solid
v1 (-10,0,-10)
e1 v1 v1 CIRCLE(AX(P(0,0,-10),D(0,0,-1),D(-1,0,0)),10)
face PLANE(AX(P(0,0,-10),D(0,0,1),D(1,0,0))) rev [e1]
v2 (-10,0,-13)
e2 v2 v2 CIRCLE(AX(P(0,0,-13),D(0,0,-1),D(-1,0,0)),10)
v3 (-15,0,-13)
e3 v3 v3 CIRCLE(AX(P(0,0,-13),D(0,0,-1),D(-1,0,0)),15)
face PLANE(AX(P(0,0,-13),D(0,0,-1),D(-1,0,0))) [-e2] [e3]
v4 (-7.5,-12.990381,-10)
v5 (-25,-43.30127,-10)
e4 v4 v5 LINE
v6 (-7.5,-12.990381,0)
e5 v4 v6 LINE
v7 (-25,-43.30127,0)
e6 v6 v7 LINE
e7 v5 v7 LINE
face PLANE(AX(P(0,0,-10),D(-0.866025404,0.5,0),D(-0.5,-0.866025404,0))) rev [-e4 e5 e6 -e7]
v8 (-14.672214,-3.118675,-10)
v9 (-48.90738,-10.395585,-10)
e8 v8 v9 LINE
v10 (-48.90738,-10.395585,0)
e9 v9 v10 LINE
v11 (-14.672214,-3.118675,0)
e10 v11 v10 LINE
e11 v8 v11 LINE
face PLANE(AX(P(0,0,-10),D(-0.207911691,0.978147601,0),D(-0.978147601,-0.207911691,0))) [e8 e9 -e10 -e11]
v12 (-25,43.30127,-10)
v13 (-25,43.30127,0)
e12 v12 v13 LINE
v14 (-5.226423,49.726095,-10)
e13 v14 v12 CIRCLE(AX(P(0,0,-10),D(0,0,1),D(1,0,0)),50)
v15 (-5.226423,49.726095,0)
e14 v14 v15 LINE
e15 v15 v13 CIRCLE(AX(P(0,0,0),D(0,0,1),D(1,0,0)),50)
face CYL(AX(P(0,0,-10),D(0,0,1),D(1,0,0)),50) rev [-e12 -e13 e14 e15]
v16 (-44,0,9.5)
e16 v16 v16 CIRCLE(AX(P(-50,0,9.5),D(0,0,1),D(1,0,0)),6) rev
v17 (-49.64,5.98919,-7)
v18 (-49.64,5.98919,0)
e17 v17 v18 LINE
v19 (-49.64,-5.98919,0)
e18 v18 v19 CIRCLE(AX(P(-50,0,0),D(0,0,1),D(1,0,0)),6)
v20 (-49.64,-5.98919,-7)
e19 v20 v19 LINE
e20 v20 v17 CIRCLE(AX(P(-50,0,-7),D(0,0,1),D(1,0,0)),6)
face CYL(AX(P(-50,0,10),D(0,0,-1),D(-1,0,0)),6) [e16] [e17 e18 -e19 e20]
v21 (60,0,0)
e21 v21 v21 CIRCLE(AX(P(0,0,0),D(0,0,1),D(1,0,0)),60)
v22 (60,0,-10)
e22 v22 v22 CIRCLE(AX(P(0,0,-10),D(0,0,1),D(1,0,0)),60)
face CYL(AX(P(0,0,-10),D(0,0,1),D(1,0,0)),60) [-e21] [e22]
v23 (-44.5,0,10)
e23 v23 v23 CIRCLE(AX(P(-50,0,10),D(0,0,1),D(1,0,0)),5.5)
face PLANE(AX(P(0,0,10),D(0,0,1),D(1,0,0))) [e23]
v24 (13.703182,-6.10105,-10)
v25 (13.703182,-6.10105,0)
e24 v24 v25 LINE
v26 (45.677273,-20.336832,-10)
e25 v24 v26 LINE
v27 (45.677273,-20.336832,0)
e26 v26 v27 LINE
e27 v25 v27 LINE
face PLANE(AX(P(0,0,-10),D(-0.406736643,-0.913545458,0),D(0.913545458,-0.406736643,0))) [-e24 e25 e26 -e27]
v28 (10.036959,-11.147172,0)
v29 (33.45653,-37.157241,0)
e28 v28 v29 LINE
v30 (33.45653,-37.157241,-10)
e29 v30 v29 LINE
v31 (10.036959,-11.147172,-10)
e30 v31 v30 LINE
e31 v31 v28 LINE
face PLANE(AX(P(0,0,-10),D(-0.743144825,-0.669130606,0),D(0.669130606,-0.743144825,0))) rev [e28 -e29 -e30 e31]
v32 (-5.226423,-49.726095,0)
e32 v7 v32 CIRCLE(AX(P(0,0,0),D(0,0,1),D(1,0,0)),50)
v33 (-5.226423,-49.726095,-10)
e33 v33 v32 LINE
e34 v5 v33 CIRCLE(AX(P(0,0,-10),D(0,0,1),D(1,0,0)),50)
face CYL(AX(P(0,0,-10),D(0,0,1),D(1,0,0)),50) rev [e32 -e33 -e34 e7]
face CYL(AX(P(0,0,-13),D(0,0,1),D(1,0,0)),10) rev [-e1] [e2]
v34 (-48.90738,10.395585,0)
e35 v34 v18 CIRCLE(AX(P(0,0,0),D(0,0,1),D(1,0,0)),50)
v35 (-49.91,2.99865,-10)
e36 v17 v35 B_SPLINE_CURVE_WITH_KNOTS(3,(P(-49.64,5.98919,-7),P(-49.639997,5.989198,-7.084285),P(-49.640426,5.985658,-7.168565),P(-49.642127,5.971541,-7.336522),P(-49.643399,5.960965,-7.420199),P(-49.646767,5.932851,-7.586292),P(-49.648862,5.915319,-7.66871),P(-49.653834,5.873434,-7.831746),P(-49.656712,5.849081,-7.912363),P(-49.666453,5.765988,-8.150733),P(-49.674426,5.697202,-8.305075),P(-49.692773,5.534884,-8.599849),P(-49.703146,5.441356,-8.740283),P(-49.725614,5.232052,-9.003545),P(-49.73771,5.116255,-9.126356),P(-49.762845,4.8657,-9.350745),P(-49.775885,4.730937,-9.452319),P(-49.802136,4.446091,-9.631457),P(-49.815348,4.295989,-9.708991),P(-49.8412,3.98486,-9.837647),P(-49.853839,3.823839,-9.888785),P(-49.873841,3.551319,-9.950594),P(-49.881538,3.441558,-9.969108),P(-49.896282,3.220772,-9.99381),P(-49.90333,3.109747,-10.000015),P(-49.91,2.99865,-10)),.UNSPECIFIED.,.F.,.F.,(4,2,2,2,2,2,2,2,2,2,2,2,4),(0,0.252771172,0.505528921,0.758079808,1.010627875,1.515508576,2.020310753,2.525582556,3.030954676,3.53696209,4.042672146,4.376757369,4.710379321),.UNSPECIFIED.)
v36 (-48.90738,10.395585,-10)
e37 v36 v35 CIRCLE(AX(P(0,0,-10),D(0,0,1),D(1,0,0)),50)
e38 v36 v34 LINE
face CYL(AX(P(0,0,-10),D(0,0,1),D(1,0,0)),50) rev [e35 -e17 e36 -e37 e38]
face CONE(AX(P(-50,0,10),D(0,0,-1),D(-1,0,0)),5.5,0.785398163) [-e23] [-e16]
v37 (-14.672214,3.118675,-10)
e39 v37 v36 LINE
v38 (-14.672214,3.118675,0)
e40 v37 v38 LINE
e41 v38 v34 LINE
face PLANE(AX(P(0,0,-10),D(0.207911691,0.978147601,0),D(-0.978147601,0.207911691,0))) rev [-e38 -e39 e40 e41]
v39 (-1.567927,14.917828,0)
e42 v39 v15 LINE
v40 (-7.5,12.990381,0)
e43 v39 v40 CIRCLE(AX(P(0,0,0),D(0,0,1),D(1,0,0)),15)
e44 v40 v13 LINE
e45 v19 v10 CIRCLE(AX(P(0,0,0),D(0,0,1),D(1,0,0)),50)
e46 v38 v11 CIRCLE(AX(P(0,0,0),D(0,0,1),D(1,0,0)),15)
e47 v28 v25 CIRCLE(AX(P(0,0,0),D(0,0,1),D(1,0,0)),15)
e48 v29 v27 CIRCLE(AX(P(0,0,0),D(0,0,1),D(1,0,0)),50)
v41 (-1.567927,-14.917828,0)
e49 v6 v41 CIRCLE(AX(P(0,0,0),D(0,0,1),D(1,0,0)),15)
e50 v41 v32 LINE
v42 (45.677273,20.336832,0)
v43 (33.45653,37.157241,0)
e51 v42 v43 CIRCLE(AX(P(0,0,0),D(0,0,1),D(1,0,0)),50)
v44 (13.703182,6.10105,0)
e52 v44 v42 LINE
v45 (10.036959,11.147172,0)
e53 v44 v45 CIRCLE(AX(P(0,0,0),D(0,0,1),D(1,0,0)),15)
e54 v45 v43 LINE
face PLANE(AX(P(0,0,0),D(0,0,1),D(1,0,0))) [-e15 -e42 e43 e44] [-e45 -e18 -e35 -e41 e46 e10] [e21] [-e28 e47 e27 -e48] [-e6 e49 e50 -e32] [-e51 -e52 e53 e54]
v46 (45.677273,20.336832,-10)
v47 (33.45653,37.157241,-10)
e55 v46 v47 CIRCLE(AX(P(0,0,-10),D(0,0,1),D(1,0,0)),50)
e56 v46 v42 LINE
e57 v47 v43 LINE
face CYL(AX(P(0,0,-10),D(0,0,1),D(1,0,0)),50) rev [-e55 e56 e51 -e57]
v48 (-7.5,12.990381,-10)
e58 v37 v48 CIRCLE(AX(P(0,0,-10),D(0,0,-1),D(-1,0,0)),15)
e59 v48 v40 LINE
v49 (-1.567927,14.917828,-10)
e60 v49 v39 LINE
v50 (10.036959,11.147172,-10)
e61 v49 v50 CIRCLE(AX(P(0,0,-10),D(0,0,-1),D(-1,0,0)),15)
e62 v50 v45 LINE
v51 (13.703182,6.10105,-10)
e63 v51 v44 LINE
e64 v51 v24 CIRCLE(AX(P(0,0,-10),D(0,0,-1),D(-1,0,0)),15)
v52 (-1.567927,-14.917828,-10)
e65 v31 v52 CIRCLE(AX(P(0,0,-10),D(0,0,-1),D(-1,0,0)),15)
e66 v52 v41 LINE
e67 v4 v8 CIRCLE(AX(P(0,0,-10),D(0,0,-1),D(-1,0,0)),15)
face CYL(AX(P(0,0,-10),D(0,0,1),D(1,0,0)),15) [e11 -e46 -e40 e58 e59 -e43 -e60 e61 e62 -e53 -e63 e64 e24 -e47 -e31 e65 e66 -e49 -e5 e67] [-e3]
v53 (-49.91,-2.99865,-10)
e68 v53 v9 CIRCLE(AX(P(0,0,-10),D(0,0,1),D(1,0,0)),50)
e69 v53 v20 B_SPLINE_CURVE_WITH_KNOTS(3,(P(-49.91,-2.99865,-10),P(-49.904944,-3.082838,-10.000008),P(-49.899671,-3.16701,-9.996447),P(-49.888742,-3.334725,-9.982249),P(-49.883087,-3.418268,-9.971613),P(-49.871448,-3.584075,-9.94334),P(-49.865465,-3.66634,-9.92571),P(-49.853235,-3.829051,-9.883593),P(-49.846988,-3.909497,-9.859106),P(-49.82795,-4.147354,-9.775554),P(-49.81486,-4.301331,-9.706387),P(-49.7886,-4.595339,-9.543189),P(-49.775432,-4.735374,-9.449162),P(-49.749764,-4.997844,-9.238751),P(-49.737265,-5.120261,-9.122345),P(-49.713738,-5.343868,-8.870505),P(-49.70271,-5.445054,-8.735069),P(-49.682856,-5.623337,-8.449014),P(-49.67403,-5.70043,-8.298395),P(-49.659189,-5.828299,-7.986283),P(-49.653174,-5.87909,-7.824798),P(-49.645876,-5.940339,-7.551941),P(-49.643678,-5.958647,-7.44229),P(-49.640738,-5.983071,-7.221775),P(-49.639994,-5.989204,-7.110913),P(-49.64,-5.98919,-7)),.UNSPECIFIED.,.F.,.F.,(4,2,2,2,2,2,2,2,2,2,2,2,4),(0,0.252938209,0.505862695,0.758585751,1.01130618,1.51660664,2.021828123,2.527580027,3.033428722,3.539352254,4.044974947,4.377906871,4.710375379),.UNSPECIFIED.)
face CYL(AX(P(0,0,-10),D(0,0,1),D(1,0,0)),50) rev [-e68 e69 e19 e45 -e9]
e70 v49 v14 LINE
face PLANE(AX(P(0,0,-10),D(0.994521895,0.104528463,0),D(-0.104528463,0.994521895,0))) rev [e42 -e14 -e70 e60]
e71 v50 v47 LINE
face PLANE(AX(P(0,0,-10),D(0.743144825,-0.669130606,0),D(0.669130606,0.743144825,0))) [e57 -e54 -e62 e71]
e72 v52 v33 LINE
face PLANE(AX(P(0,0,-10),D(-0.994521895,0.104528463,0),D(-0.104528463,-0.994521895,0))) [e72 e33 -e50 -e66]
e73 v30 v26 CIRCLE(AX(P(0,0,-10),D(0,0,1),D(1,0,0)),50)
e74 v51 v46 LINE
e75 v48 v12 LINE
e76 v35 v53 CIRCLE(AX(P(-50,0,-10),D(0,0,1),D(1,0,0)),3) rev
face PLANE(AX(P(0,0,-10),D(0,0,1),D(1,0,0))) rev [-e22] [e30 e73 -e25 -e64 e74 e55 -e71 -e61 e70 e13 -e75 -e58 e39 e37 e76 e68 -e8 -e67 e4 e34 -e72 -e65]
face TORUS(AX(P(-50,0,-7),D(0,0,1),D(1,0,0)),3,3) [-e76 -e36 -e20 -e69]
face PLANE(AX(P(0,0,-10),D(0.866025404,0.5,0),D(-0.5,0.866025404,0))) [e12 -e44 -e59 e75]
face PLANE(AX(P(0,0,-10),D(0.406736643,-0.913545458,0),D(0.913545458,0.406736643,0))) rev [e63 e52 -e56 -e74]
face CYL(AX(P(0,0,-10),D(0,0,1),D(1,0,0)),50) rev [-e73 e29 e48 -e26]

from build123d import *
from build123d.topology import SkipClean

# Parameters (mm, degrees)
SKETCH1_R           = 60
BOSS_EXTRUDE1_DEPTH = 10
SKETCH1_3_R         = 6
BOSS_EXTRUDE2_DEPTH = 10
CUT_EXTRUDE1_START  = -10
CUT_EXTRUDE1_DEPTH  = 10
BOSS_EXTRUDE4_START = 3
SKETCH3_R           = 15
SKETCH3_R_2         = 10
BOSS_EXTRUDE4_DEPTH = 3
FILLET1_R           = 3
CHAMFER1_SIZE       = 0.5


with BuildPart() as part:
    # Sketch1 → Boss-Extrude1 (new body)
    with BuildSketch(Plane.XY):
        Circle(SKETCH1_R)
    extrude(amount=-BOSS_EXTRUDE1_DEPTH)

    # Sketch1<3> → Boss-Extrude2 (add)
    with BuildSketch(Plane.XY):
        with Locations((-50, 0)):
            Circle(SKETCH1_3_R)
    extrude(amount=BOSS_EXTRUDE2_DEPTH)

    # Sketch2 → Cut-Extrude1 (cut)
    with SkipClean():  # the faces are left unmerged after this step: merging them gives an invalid solid
        with BuildSketch(Plane.XY.offset(CUT_EXTRUDE1_START)):
            with BuildLine():
                ThreePointArc((-14.672214011, -3.118675362), (-14.917828431, -1.567926949), (-15, 0))
                Line((-15, 0), (-44, 0))
                ThreePointArc((-44, 0), (-45.631934066, -4.11339276), (-49.64, -5.989190262))
                ThreePointArc((-49.64, -5.989190262), (-49.322921706, -8.200572806), (-48.907380037, -10.395584541))
                Line((-48.907380037, -10.395584541), (-14.672214011, -3.118675362))
            make_face()
            with BuildLine():
                Line((-44, 0), (-15, 0))
                ThreePointArc((-15, 0), (-14.917828431, 1.567926949), (-14.672214011, 3.118675362))
                Line((-14.672214011, 3.118675362), (-48.907380037, 10.395584541))
                ThreePointArc((-48.907380037, 10.395584541), (-49.322921706, 8.200572806), (-49.64, 5.989190262))
                ThreePointArc((-49.64, 5.989190262), (-45.631934066, 4.11339276), (-44, 0))
            make_face()
            with BuildLine():
                Line((-25, 43.301270189), (-7.5, 12.990381057))
                ThreePointArc((-7.5, 12.990381057), (-4.635254916, 14.265847744), (-1.567926949, 14.917828431))
                Line((-1.567926949, 14.917828431), (-5.226423163, 49.726094768))
                ThreePointArc((-5.226423163, 49.726094768), (-15.450849719, 47.552825815), (-25, 43.301270189))
            make_face()
            with BuildLine():
                ThreePointArc((10.036959095, 11.147172382), (12.135254916, 8.816778784), (13.703181865, 6.101049646))
                Line((13.703181865, 6.101049646), (45.677272882, 20.336832154))
                ThreePointArc((45.677272882, 20.336832154), (40.450849719, 29.389262615), (33.456530318, 37.157241274))
                Line((33.456530318, 37.157241274), (10.036959095, 11.147172382))
            make_face()
            with BuildLine():
                ThreePointArc((13.703181865, -6.101049646), (12.135254916, -8.816778784), (10.036959095, -11.147172382))
                Line((10.036959095, -11.147172382), (33.456530318, -37.157241274))
                ThreePointArc((33.456530318, -37.157241274), (40.450849719, -29.389262615), (45.677272882, -20.336832154))
                Line((45.677272882, -20.336832154), (13.703181865, -6.101049646))
            make_face()
            with BuildLine():
                ThreePointArc((-1.567926949, -14.917828431), (-4.635254916, -14.265847744), (-7.5, -12.990381057))
                Line((-7.5, -12.990381057), (-25, -43.301270189))
                ThreePointArc((-25, -43.301270189), (-15.450849719, -47.552825815), (-5.226423163, -49.726094768))
                Line((-5.226423163, -49.726094768), (-1.567926949, -14.917828431))
            make_face()
        extrude(amount=CUT_EXTRUDE1_DEPTH, mode=Mode.SUBTRACT)

    # Sketch3 → Boss-Extrude4 (add)
    with SkipClean():  # the faces are left unmerged after this step: merging them gives an invalid solid
        with BuildSketch(Plane(origin=(0, 0, -10), x_dir=(-1, 0, 0), z_dir=(0, 0, -1)).offset(BOSS_EXTRUDE4_START)):
            with Locations(Location((0, 0, 0), (0, 0, 156))):
                Circle(SKETCH3_R)
            Circle(SKETCH3_R_2, mode=Mode.SUBTRACT)
        extrude(amount=-BOSS_EXTRUDE4_DEPTH)

    # Fillet1
    # the kernel refuses this fillet: 3 mm, written as the material it takes off along each edge
    with BuildSketch(Plane(origin=(-50, 0, -10), x_dir=(-0.9290450691294319, 0.3699665654167807, 0), z_dir=(-0.3699665654167807, -0.9290450691294319, 0))) as fillet1_piece_1_section:
        with BuildLine():
            CenterArc((6 - FILLET1_R, -FILLET1_R), FILLET1_R, 0, 90)
            Line((6, -FILLET1_R), (6, 0))
            Line((6, 0), (6 - FILLET1_R, 0))
        make_face()
    fillet1_piece_1 = revolve(axis=Axis((-50, 0, -10), (0, 0, -1)), revolution_arc=316.572889398, mode=Mode.PRIVATE)
    fillet1_piece_1 = fillet1_piece_1 & Plane(origin=(0, 0, -9.144891987), x_dir=(-0.9928000000000012, -0.1197838052492802, 0), z_dir=(0, 0, -1)) * Cylinder(50, 24, mode=Mode.PRIVATE)
    add(fillet1_piece_1, mode=Mode.SUBTRACT)

    # Chamfer1
    chamfer1_edges = [part.edges().sort_by_distance(p)[0] for p in [
        (-56, 0, 10),
    ]]
    chamfer(chamfer1_edges, length=CHAMFER1_SIZE)


solid = part.part
